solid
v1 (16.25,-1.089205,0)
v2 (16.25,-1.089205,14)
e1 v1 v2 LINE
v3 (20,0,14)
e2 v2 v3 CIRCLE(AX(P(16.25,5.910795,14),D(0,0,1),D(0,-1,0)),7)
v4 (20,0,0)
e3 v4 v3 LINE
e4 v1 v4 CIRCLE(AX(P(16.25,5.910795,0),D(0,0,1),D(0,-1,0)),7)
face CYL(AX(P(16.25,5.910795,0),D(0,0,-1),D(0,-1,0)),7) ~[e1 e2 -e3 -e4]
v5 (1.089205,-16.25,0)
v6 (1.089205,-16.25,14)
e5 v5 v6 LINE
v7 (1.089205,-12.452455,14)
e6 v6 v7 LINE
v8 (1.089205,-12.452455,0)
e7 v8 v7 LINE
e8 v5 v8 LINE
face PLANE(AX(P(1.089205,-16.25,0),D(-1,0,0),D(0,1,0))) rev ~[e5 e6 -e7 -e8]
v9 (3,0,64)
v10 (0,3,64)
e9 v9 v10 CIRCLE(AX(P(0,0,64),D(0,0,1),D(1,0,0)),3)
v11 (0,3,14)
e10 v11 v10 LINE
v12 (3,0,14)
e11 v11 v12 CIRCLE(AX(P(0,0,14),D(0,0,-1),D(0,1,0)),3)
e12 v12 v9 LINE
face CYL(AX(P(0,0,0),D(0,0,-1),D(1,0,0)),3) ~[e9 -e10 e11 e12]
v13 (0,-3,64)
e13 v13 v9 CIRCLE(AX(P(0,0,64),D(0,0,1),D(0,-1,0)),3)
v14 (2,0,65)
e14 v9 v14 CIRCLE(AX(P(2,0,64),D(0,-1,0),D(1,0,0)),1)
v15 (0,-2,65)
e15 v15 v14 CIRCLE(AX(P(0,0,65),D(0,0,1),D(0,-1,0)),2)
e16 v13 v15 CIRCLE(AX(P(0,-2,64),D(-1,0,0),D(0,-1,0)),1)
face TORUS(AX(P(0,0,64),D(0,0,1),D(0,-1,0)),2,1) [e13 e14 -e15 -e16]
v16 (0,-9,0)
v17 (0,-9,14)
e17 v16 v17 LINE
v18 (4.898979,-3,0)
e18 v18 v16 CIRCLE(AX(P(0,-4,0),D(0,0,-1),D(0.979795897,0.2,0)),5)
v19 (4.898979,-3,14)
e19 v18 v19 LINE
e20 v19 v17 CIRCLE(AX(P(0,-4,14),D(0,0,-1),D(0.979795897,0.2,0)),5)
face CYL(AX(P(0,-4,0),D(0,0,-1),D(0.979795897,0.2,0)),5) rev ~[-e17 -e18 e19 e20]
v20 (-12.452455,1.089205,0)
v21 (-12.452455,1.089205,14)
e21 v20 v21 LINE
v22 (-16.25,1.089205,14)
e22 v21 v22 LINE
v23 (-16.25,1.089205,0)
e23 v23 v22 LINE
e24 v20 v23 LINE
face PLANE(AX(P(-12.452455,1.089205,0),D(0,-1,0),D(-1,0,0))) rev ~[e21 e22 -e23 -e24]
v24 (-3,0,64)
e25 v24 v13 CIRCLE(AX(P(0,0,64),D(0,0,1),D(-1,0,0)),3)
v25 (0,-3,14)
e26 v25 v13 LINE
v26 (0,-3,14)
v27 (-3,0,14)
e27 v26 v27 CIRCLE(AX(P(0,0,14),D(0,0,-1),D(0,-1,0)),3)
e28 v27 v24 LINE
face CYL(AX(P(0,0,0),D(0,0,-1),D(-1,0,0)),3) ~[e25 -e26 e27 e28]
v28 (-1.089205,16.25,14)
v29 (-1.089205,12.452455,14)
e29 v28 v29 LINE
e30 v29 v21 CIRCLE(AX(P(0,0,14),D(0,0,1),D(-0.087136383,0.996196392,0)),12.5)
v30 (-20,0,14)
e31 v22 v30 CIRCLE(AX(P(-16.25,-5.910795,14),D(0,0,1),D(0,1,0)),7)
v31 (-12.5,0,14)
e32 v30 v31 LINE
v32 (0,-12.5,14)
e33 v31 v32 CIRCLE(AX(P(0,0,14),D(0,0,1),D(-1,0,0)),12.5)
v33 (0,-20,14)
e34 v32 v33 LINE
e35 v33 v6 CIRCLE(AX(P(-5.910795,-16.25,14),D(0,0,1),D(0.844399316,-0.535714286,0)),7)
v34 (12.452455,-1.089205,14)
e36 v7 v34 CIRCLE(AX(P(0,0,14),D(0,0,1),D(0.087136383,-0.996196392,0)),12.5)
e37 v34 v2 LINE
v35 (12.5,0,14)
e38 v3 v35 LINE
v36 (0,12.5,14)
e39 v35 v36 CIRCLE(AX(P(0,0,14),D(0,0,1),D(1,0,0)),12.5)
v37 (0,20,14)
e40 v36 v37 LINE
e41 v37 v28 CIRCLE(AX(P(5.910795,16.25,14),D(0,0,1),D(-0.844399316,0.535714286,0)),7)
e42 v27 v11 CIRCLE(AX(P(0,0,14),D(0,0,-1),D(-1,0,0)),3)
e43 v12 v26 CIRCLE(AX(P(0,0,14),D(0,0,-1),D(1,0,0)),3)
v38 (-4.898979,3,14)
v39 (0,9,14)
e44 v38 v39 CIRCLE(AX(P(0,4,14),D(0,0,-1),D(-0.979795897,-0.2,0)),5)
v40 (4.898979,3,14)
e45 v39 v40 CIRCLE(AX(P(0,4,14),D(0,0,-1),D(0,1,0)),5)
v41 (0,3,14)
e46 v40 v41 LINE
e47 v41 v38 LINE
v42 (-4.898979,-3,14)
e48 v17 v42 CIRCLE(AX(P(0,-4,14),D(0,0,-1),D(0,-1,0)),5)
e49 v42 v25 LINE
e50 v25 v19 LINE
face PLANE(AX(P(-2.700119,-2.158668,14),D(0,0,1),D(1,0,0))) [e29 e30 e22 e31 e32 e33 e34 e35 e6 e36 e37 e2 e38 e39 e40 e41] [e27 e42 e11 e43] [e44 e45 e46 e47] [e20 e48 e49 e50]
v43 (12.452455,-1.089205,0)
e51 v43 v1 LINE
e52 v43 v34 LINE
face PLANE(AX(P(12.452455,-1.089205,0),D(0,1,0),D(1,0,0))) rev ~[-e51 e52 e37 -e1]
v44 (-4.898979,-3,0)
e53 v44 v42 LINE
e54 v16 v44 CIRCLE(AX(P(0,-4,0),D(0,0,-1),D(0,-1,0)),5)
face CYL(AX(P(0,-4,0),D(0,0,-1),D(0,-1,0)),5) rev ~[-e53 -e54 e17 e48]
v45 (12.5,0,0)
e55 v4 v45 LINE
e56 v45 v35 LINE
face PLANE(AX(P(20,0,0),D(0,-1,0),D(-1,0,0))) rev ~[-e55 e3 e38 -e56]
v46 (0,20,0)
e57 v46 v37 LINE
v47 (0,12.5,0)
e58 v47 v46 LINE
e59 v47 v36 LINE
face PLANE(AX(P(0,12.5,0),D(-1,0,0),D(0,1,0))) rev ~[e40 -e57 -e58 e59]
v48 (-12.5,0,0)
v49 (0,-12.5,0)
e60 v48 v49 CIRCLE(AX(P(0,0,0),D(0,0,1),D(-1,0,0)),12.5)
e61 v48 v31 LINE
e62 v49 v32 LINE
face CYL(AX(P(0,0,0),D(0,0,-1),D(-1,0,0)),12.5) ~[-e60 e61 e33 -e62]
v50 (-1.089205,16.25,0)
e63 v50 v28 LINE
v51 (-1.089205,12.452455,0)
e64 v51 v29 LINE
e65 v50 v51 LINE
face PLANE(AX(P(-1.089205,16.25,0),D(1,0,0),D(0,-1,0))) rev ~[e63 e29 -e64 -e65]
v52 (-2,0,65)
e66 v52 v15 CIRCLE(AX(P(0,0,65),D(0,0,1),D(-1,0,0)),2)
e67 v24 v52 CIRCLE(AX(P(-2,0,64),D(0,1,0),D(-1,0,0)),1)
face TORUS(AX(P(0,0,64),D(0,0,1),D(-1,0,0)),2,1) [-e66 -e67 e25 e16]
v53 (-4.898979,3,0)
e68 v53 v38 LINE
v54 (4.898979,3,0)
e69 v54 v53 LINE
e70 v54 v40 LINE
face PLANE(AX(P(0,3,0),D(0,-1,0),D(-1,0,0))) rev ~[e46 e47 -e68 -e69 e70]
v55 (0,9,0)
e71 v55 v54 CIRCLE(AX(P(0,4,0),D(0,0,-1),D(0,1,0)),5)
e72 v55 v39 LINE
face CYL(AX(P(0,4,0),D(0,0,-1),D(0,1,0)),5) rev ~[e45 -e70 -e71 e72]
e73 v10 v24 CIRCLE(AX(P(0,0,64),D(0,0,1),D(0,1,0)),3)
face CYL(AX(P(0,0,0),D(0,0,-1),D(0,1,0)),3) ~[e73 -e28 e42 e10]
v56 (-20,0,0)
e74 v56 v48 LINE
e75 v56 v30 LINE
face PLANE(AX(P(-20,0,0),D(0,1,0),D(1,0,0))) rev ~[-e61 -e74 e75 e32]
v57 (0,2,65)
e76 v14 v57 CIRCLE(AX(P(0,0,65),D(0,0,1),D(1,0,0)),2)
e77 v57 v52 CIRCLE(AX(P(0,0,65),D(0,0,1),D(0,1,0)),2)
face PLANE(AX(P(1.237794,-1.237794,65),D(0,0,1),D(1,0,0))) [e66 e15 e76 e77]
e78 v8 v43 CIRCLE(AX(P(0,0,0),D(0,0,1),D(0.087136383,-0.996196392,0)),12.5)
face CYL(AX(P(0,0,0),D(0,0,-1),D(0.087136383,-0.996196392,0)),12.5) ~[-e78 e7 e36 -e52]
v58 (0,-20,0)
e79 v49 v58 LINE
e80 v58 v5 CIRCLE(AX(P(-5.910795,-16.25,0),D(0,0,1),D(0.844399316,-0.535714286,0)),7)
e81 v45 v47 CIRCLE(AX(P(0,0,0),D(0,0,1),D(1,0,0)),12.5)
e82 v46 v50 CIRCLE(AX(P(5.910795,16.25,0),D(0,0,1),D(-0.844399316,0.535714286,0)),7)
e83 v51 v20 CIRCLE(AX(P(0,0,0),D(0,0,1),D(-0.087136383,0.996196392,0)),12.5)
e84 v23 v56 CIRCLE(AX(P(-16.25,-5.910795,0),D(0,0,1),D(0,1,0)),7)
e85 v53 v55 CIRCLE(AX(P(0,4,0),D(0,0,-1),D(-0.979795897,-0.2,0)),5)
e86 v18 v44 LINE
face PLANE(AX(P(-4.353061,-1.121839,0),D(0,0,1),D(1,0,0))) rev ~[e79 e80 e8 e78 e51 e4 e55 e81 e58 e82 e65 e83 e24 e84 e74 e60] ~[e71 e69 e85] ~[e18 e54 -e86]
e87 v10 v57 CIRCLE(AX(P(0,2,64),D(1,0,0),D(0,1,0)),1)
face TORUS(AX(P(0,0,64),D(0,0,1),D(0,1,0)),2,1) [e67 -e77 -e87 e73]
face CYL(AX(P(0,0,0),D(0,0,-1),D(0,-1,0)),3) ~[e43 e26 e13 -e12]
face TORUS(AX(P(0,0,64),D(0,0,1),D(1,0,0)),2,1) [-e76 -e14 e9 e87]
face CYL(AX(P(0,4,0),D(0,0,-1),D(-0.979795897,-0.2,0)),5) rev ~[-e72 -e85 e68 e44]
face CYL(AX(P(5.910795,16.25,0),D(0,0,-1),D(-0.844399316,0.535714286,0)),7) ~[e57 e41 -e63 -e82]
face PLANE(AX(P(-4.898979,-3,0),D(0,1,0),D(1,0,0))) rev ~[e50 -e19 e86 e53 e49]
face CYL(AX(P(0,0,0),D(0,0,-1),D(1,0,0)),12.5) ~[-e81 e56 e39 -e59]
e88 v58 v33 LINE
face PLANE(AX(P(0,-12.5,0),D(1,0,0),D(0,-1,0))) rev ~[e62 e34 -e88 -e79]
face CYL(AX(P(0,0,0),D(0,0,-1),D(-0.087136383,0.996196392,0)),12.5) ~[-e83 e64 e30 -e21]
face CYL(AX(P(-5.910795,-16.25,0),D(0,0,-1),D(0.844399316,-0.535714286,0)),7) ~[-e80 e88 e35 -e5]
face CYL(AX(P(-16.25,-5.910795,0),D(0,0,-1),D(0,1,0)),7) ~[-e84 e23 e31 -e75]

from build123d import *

# Parameters (mm, degrees)
F1_DEPTH = 65
F2_DEPTH = 14
F3_DEPTH = 14
F4_R     = 1
F5_DEPTH = 14


# Not quite as in the source:
# - a feature names something its author has since deleted; it is built from what else it names


with BuildPart() as f1:
    # F0 (on Top) → F1 (new body)
    with BuildSketch(Plane.XY):
        with BuildLine():
            ThreePointArc((0, -3), (2.1213203436, -2.1213203436), (3, 0))
            Line((3, 0), (0, 0))
            Line((0, 0), (0, -3))
        make_face()
        with BuildLine():
            Line((0, 0), (3, 0))
            ThreePointArc((3, 0), (2.1213203436, 2.1213203436), (0, 3))
            Line((0, 3), (0, 0))
        make_face()
        with BuildLine():
            Line((0, 0), (0, 3))
            ThreePointArc((0, 3), (-2.1213203436, 2.1213203436), (-3, 0))
            Line((-3, 0), (0, 0))
        make_face()
        with BuildLine():
            ThreePointArc((-3, 0), (-2.1213203436, -2.1213203436), (0, -3))
            Line((0, -3), (0, 0))
            Line((0, 0), (-3, 0))
        make_face()
    extrude(amount=F1_DEPTH)



with BuildPart() as f2:
    # F0 (on Top) → F2 (new body)
    with BuildSketch(Plane.XY):
        with BuildLine():
            ThreePointArc((-4.8989794856, 3), (-3.8729833462, 7.1622776602), (0, 9))
            Line((0, 9), (0, 12.5))
            ThreePointArc((0, 12.5), (-0.545120999, 12.4881080671), (-1.0892047912, 12.4524548954))
            ThreePointArc((-1.0892047912, 12.4524548954), (-8.8388347648, 8.8388347648), (-12.4524548954, 1.0892047912))
            ThreePointArc((-12.4524548954, 1.0892047912), (-12.4881080671, 0.545120999), (-12.5, 0))
            Line((-12.5, 0), (-4.8989794856, 0))
            Line((-4.8989794856, 0), (-4.8989794856, 3))
        make_face()
        with BuildLine():
            Line((0, -12.5), (0, -9))
            ThreePointArc((0, -9), (-3.8729833462, -7.1622776602), (-4.8989794856, -3))
            Line((-4.8989794856, -3), (-4.8989794856, 0))
            Line((-4.8989794856, 0), (-12.5, 0))
            ThreePointArc((-12.5, 0), (-8.8388347648, -8.8388347648), (0, -12.5))
        make_face()
        with BuildLine():
            Line((12.5, 0), (4.8989794856, 0))
            Line((4.8989794856, 0), (4.8989794856, -3))
            ThreePointArc((4.8989794856, -3), (3.8729833462, -7.1622776602), (0, -9))
            Line((0, -9), (0, -12.5))
            ThreePointArc((0, -12.5), (0.545120999, -12.4881080671), (1.0892047912, -12.4524548954))
            ThreePointArc((1.0892047912, -12.4524548954), (8.8388347648, -8.8388347648), (12.4524548954, -1.0892047912))
            ThreePointArc((12.4524548954, -1.0892047912), (12.4881080671, -0.545120999), (12.5, 0))
        make_face()
        with BuildLine():
            Line((4.8989794856, 3), (4.8989794856, 0))
            Line((4.8989794856, 0), (12.5, 0))
            ThreePointArc((12.5, 0), (8.8388347648, 8.8388347648), (0, 12.5))
            Line((0, 12.5), (0, 9))
            ThreePointArc((0, 9), (3.8729833462, 7.1622776602), (4.8989794856, 3))
        make_face()
    extrude(amount=F2_DEPTH)


with BuildPart() as f1_1:
    add(f1.part)

    add(f2.part)  # F2#2 merges F2
    # F0 (on Top) → F2, piece 2 (join)
    with BuildSketch(Plane.XY):
        with BuildLine():
            ThreePointArc((-3, 0), (-2.1213203436, 2.1213203436), (0, 3))
            Line((0, 3), (-4.8989794856, 3))
            ThreePointArc((-4.8989794856, 3), (-4.2247448714, 1.3257653858), (-3, 0))
        make_face()
        with BuildLine():
            ThreePointArc((0, 3), (2.1213203436, 2.1213203436), (3, 0))
            ThreePointArc((3, 0), (4.2247448714, 1.3257653858), (4.8989794856, 3))
            Line((4.8989794856, 3), (0, 3))
        make_face()
        with BuildLine():
            ThreePointArc((4.8989794856, -3), (4.2247448714, -1.3257653858), (3, 0))
            ThreePointArc((3, 0), (2.1213203436, -2.1213203436), (0, -3))
            Line((0, -3), (4.8989794856, -3))
        make_face()
        with BuildLine():
            Line((-4.8989794856, -3), (0, -3))
            ThreePointArc((0, -3), (-2.1213203436, -2.1213203436), (-3, 0))
            ThreePointArc((-3, 0), (-4.2247448714, -1.3257653858), (-4.8989794856, -3))
        make_face()
    extrude(amount=F2_DEPTH)

    # F0 (on Top) → F3 (join)
    with BuildSketch(Plane.XY):
        with BuildLine():
            Line((20, 0), (12.5, 0))
            ThreePointArc((12.5, 0), (14.2975101103, -0.811390688), (16.25, -1.0892047912))
            ThreePointArc((16.25, -1.0892047912), (18.2024898897, -0.811390688), (20, 0))
        make_face()
        with BuildLine():
            ThreePointArc((-1.0892047912, 16.25), (-0.811390688, 14.2975101103), (0, 12.5))
            Line((0, 12.5), (0, 20))
            ThreePointArc((0, 20), (-0.811390688, 18.2024898897), (-1.0892047912, 16.25))
        make_face()
        with BuildLine():
            Line((-20, 0), (-12.5, 0))
            ThreePointArc((-12.5, 0), (-14.2975101103, 0.811390688), (-16.25, 1.0892047912))
            ThreePointArc((-16.25, 1.0892047912), (-18.2024898897, 0.811390688), (-20, 0))
        make_face()
        with BuildLine():
            ThreePointArc((1.0892047912, -16.25), (0.811390688, -14.2975101103), (0, -12.5))
            Line((0, -12.5), (0, -20))
            ThreePointArc((0, -20), (0.811390688, -18.2024898897), (1.0892047912, -16.25))
        make_face()
        with BuildLine():
            ThreePointArc((16.25, -1.0892047912), (14.2975101103, -0.811390688), (12.5, 0))
            ThreePointArc((12.5, 0), (12.4881080671, -0.545120999), (12.4524548954, -1.0892047912))
            Line((12.4524548954, -1.0892047912), (16.25, -1.0892047912))
        make_face()
        with BuildLine():
            ThreePointArc((-1.0892047912, 12.4524548954), (-0.545120999, 12.4881080671), (0, 12.5))
            ThreePointArc((0, 12.5), (-0.811390688, 14.2975101103), (-1.0892047912, 16.25))
            Line((-1.0892047912, 16.25), (-1.0892047912, 12.4524548954))
        make_face()
        with BuildLine():
            ThreePointArc((-16.25, 1.0892047912), (-14.2975101103, 0.811390688), (-12.5, 0))
            ThreePointArc((-12.5, 0), (-12.4881080671, 0.545120999), (-12.4524548954, 1.0892047912))
            Line((-12.4524548954, 1.0892047912), (-16.25, 1.0892047912))
        make_face()
        with BuildLine():
            ThreePointArc((1.0892047912, -12.4524548954), (0.545120999, -12.4881080671), (0, -12.5))
            ThreePointArc((0, -12.5), (0.811390688, -14.2975101103), (1.0892047912, -16.25))
            Line((1.0892047912, -16.25), (1.0892047912, -12.4524548954))
        make_face()
    extrude(amount=F3_DEPTH)

    # F4
    f4_edges = [f1_1.edges().sort_by_distance(p)[0] for p in [
        (3, 0, 65),
    ]]
    fillet(f4_edges, radius=F4_R)

    # F0 (on Top) → F5 (join)
    with BuildSketch(Plane.XY):
        with BuildLine():
            ThreePointArc((-4.8989794856, -3), (-4.2247448714, -1.3257653858), (-3, 0))
            Line((-3, 0), (-4.8989794856, 0))
            Line((-4.8989794856, 0), (-4.8989794856, -3))
        make_face()
        with BuildLine():
            Line((-4.8989794856, 0), (-3, 0))
            ThreePointArc((-3, 0), (-4.2247448714, 1.3257653858), (-4.8989794856, 3))
            Line((-4.8989794856, 3), (-4.8989794856, 0))
        make_face()
        with BuildLine():
            ThreePointArc((4.8989794856, 3), (4.2247448714, 1.3257653858), (3, 0))
            Line((3, 0), (4.8989794856, 0))
            Line((4.8989794856, 0), (4.8989794856, 3))
        make_face()
        with BuildLine():
            Line((4.8989794856, 0), (3, 0))
            ThreePointArc((3, 0), (4.2247448714, -1.3257653858), (4.8989794856, -3))
            Line((4.8989794856, -3), (4.8989794856, 0))
        make_face()
    extrude(amount=F5_DEPTH)


solid = f1_1.part
